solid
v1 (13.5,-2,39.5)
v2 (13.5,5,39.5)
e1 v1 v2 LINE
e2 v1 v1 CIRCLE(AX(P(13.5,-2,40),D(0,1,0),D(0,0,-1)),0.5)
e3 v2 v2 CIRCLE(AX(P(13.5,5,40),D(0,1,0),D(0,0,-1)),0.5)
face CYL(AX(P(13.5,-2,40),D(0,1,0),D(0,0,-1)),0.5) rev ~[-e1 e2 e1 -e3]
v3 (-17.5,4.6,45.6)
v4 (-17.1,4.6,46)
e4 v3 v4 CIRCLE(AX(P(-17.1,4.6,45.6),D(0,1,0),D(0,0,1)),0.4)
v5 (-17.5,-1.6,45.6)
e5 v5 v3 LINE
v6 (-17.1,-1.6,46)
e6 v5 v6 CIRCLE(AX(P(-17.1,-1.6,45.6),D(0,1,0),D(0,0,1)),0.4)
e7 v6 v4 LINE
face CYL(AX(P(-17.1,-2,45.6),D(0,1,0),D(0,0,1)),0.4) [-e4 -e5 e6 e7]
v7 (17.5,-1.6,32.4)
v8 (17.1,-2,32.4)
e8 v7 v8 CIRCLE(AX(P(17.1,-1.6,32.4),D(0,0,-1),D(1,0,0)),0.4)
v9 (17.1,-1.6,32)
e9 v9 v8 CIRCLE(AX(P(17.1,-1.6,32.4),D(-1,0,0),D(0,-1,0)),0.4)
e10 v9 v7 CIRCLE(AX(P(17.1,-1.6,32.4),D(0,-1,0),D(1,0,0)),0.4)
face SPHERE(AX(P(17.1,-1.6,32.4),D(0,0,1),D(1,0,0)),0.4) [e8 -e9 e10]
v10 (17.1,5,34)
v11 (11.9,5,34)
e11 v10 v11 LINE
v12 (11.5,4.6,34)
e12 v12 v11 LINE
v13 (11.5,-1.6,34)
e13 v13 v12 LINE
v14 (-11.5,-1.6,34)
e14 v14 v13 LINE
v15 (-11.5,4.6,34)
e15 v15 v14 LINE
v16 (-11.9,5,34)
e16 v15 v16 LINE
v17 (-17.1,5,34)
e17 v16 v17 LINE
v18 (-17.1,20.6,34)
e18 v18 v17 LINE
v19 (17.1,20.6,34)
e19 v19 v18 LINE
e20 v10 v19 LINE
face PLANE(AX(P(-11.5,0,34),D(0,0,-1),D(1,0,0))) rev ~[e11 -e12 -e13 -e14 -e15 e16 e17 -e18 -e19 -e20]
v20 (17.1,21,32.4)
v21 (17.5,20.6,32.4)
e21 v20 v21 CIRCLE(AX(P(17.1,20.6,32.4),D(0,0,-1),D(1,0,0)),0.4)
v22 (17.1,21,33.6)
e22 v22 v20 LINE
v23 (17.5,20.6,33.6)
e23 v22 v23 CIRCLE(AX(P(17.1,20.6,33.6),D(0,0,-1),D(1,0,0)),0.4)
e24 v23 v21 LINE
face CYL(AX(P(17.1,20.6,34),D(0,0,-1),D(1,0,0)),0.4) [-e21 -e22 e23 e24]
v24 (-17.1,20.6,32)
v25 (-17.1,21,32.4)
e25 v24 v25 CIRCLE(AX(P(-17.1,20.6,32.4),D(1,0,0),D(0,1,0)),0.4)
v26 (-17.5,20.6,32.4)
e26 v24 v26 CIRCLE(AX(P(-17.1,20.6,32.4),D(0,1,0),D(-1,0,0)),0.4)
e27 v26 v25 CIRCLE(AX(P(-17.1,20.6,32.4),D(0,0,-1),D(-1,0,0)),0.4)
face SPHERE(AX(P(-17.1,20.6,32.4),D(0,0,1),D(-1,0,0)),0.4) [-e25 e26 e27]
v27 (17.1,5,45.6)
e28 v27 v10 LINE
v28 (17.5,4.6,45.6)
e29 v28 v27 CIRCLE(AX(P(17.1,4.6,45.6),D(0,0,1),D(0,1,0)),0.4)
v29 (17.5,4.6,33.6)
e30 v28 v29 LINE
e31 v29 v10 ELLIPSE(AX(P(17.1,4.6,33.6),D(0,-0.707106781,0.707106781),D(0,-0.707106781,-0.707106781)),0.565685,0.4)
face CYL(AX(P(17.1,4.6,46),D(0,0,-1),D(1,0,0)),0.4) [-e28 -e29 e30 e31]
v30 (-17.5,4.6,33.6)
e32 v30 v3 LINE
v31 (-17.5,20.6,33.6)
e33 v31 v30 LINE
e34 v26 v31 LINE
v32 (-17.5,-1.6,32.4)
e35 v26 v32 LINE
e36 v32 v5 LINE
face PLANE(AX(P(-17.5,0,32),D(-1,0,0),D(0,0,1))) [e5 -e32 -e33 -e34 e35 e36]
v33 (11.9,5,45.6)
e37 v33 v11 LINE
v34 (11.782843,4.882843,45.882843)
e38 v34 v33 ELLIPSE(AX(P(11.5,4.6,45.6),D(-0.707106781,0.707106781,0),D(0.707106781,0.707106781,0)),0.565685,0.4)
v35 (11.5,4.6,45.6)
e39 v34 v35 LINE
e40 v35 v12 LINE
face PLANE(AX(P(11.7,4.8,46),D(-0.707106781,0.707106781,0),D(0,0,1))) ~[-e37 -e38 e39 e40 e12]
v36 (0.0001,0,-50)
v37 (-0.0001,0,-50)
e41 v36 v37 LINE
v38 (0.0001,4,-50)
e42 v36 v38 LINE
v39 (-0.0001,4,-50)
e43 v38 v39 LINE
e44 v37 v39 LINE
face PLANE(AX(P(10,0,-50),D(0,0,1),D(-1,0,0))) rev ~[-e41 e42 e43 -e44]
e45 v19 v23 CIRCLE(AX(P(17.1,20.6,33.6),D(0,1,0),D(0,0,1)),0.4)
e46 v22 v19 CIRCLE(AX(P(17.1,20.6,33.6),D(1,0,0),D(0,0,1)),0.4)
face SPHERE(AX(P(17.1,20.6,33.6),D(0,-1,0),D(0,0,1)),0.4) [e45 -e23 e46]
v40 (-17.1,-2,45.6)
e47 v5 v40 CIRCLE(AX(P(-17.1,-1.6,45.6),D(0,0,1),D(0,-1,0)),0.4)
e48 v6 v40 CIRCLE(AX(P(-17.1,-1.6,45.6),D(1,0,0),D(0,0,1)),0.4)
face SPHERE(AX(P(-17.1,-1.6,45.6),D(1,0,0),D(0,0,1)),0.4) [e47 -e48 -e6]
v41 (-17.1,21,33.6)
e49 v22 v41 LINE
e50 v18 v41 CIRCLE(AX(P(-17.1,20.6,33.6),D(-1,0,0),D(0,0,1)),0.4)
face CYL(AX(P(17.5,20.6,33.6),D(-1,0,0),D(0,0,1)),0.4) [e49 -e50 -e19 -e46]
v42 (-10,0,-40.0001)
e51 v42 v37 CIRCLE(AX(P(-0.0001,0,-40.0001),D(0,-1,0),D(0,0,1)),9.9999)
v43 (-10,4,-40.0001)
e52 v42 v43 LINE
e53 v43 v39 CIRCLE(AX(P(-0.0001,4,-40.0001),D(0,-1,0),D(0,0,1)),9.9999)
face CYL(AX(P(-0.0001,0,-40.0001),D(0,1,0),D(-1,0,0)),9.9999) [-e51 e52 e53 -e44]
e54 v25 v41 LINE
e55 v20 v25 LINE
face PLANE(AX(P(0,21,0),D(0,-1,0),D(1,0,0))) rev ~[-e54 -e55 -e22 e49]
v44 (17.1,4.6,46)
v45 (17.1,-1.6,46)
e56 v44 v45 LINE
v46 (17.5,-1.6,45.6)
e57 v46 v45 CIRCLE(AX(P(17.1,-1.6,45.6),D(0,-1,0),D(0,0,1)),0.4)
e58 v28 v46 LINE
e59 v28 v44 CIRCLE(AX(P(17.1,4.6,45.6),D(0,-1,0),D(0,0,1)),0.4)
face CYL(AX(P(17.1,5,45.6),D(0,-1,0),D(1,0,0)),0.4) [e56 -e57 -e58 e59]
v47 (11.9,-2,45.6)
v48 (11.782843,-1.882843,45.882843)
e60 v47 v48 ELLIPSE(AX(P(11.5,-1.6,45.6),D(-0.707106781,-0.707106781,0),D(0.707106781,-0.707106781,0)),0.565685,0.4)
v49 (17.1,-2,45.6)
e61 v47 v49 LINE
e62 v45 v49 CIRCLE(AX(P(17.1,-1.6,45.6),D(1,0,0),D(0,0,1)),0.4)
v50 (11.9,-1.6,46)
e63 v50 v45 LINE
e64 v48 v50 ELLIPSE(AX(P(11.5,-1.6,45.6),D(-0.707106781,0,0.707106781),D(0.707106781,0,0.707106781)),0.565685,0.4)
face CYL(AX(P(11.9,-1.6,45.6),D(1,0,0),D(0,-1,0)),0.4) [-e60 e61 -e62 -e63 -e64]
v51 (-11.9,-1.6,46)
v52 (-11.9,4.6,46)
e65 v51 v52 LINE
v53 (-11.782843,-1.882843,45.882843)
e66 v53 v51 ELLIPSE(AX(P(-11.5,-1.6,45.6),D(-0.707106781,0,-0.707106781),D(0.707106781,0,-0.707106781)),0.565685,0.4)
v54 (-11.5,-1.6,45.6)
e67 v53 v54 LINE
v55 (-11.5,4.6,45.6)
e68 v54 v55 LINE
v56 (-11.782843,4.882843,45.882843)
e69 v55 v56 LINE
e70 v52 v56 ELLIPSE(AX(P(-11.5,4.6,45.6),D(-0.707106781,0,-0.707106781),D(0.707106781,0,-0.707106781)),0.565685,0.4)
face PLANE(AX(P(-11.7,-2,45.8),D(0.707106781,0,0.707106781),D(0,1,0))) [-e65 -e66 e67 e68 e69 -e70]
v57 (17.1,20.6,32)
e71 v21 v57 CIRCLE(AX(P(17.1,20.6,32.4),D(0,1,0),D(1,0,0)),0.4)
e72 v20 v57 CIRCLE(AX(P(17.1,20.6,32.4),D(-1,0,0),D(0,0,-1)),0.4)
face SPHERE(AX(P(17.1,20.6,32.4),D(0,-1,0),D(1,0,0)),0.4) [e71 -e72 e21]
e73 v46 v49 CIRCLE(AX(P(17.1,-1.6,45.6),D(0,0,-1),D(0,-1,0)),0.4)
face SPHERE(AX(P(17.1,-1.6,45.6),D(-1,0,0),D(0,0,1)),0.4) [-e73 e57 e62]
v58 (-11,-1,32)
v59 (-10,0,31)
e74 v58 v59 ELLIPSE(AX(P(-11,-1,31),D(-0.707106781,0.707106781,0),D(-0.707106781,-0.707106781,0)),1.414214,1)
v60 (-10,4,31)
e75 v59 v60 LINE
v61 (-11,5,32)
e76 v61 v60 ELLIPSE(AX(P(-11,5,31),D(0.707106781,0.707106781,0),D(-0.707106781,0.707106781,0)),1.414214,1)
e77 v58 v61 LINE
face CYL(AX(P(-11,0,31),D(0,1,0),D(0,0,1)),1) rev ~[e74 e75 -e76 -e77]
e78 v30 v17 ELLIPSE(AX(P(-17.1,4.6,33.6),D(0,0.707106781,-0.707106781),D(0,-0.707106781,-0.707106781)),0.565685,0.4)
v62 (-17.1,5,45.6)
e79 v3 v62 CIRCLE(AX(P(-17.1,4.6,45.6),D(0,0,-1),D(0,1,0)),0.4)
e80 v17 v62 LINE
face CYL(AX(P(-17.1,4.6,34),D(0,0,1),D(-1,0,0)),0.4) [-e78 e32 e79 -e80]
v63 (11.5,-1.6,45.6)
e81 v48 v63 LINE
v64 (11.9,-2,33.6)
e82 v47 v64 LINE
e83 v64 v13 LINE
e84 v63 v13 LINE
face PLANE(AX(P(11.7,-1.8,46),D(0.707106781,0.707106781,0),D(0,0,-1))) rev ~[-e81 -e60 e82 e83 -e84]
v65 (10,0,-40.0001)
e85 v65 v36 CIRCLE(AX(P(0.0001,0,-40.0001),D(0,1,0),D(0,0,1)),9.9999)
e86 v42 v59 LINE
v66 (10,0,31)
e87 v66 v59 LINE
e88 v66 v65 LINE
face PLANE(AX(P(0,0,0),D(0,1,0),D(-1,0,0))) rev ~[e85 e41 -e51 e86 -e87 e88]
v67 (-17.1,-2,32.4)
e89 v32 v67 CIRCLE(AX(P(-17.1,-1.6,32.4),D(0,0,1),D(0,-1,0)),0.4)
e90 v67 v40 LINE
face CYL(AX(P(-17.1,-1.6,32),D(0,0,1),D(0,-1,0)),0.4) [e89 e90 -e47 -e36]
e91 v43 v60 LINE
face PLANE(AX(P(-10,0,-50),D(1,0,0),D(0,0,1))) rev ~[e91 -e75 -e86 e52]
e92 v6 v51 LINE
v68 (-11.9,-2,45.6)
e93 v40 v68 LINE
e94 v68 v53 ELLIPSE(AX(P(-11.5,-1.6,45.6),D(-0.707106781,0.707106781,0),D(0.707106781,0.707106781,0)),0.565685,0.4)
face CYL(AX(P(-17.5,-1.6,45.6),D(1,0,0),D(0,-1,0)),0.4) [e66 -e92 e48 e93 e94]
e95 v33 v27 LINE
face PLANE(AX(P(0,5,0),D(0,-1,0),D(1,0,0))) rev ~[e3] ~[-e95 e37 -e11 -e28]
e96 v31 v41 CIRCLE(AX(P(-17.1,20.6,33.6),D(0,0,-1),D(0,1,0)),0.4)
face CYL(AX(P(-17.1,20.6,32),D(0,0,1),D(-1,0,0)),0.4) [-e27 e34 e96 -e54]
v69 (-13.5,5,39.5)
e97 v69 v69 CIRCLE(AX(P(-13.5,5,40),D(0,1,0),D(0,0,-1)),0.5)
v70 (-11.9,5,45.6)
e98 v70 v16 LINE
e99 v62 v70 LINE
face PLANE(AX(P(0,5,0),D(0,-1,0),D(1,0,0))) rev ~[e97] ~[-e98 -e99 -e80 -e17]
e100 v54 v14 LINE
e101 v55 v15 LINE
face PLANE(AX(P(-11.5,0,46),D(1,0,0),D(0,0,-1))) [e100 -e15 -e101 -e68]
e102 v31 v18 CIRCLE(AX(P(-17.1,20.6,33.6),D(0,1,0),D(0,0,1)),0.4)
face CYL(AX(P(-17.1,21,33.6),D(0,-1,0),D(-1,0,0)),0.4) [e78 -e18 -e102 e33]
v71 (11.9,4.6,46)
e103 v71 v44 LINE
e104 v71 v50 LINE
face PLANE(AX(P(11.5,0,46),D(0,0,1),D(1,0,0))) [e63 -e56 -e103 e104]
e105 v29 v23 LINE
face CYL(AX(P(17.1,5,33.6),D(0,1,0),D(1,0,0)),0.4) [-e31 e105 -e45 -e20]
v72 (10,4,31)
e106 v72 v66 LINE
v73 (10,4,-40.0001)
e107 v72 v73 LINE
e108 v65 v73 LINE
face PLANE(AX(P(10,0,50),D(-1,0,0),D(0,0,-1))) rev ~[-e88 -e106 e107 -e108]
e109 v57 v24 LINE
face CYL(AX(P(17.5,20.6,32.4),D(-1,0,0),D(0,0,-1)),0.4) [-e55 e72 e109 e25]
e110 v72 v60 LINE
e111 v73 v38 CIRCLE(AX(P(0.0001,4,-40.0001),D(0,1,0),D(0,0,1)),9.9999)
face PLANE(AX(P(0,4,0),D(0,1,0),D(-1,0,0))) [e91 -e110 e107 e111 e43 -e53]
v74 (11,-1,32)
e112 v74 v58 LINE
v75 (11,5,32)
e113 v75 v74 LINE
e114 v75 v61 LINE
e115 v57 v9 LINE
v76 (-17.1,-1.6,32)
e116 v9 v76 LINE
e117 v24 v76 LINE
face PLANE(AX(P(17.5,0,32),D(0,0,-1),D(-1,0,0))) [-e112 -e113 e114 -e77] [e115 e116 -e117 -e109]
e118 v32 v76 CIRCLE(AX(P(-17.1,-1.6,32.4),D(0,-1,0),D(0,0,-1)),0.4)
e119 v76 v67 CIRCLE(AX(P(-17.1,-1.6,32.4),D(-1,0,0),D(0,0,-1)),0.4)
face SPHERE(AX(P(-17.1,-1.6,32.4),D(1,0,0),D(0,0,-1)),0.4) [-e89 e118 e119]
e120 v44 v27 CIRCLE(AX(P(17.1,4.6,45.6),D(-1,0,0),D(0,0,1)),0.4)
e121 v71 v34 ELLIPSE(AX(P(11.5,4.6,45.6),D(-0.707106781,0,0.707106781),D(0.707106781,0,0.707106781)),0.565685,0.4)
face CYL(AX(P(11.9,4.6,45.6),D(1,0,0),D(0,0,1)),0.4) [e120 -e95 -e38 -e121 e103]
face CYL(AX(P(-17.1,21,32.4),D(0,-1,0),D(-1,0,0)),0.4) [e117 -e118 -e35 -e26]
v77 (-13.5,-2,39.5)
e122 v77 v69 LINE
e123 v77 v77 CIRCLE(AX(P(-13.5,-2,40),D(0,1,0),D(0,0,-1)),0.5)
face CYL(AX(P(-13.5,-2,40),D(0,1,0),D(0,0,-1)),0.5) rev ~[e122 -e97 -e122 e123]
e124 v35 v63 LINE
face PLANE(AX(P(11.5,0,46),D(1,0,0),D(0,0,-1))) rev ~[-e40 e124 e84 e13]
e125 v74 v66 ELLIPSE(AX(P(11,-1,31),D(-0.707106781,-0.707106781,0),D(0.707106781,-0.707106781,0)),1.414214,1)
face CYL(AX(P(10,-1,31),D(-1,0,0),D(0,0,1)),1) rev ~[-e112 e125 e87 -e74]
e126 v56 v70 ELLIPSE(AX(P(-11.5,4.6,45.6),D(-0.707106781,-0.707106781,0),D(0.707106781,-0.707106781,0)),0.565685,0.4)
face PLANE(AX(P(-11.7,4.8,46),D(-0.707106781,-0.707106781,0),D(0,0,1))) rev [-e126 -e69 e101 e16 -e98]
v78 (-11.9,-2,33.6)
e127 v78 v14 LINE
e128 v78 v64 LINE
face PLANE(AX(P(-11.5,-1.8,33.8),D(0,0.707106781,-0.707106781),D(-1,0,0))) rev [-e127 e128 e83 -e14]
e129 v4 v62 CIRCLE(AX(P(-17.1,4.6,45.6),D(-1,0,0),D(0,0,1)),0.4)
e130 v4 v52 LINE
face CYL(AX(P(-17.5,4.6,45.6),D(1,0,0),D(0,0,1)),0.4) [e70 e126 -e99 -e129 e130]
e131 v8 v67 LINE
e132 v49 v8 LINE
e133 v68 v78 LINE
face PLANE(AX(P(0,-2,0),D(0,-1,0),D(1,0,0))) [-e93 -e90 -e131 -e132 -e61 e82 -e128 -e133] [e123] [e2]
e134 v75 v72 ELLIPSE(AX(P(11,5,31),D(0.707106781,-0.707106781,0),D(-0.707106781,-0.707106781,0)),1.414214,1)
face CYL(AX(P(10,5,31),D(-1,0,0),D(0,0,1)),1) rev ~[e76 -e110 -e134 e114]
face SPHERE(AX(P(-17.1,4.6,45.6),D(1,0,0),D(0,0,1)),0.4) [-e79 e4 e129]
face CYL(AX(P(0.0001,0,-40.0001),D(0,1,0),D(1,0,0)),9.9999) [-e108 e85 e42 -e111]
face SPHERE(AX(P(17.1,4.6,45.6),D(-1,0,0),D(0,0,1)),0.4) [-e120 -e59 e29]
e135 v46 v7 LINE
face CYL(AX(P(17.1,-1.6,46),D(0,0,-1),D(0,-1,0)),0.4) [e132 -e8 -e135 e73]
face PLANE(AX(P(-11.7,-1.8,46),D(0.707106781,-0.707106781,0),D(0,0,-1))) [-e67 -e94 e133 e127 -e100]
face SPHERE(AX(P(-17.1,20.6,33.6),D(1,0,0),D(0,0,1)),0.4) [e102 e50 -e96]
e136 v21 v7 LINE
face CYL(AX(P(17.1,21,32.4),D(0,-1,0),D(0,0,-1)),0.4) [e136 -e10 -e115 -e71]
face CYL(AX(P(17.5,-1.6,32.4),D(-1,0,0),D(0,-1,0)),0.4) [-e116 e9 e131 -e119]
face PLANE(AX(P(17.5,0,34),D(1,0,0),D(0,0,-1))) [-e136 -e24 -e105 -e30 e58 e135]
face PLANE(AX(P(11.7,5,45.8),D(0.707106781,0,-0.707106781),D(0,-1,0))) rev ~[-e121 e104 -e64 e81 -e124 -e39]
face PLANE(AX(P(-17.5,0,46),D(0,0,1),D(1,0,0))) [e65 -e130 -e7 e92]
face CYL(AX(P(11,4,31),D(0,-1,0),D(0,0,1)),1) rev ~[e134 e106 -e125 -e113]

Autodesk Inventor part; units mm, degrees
ref_plane "YZ Plane" through (0, 0, 0) normal (1, 0, 0) x (0, 1, 0)
ref_plane "XZ Plane" through (0, 0, 0) normal (0, 1, 0) x (-1, 0, 0)
ref_plane "XY Plane" through (0, 0, 0) normal (0, 0, 1) x (1, 0, 0)
sketch "Skizze1" plane through (0, 0, 0) normal (0, 1, 0) x (-1, 0, 0)
  line L0 (-10, -50) -> (10, -50)
  line L1 (10, -50) -> (10, 50)
  line L2 (10, 50) -> (-10, 50)
  line L3 (-10, 50) -> (-10, -50)
  line L4 (-10, -50) -> (10, 50) construction
  line L5 (10, -50) -> (-10, 50) construction
  point P0 (0, 0)
  dimension "d0" = 20
  dimension "d1" = 100
extrude "Extrusion1" add sketch "Skizze1" along normal blind 4
fillet "Rundung1" radius 10 4 edges at (10, 2, -50) (-10, 2, -50) (10, 2, 50) (-10, 2, 50)
sketch "Skizze2" plane through (0, 0, 0) normal (0, -1, 0) x (1, 0, 0)
  point P0 (0, 0)
sketch "Skizze3" plane through (0, 0, 0) normal (0, -1, 0) x (1, 0, 0)
  line L0 (-17.5, 34) -> (-17.5, 46)
  line L1 (17.5, 46) -> (17.5, 34)
  line L2 (-11.5, 46) -> (-11.5, 34)
  line L3 (11.5, 46) -> (11.5, 34)
  line L4 (0, -70) -> (0, 70) projected
  line L5 (-17.5, 46) -> (-11.5, 46)
  line L6 (11.5, 46) -> (17.5, 46)
  line L7 (17.5, 34) -> (11.5, 34)
  line L8 (-11.5, 34) -> (-17.5, 34)
  point P0 (0, 0)
  point P1 (0, 34)
  point P2 (11.5, 40)
  point P3 (17.5, 40)
  point P4 (-11.5, 40)
  point P5 (-17.5, 40)
  point P6 (14.5, 34)
  point P7 (-14.5, 34)
  dimension "d6" = 12
  dimension "d7" = 35
  dimension "d11" = 23
  dimension "d12" = 34
  dimension "d13" = 6
sketch "Skizze4" plane through (0, 0, 0) normal (0, -1, 0) x (1, 0, 0)
  arc A0 (10, 40) -> (-10, 40) centre (0, 40) ccw projected
  line L0 (-11.5, 34) -> (-17.5, 34) projected
  line L1 (11.5, 46) -> (11.5, 34) projected
  line L2 (-11.5, 34) -> (11.5, 34)
  line L3 (11.5, 34) -> (11.5, 53)
  line L4 (11.5, 53) -> (-11.5, 53)
  line L5 (-11.5, 53) -> (-11.5, 34)
  point P0 (0, 0)
  dimension "d14" = 19
extrude "Extrusion2" cut sketch "Skizze4" against normal blind 4
extrude "Extrusion3" add sketch "Skizze3" along normal blind 2 and the other way blind 5
sketch "Skizze5" plane through (0, 0, 0) normal (0, -1, 0) x (1, 0, 0)
  line L0 (-17.5, 34) -> (-11.5, 34) projected
  line L1 (11.5, 34) -> (17.5, 34) projected
  line L2 (-17.5, 34) -> (17.5, 34)
  line L3 (17.5, 34) -> (17.5, 32)
  line L4 (17.5, 32) -> (-17.5, 32)
  line L5 (-17.5, 32) -> (-17.5, 34)
  point P0 (0, 0)
  dimension "d21" = 2
extrude "Extrusion4" add sketch "Skizze5" along normal blind 2 and the other way blind 21
fillet "Rundung2" radius 1 4 edges at (10, 2, 32) (0, 0, 32) (0, 4, 32) (-10, 2, 32)
chamfer "Fasen1" distance 0.4 angle 45 7 edges at (-11.5, -2, 40) (-11.5, 1.5, 46) (11.5, -2, 40) (11.5, 1.5, 46) (-11.5, 5, 40) (11.5, 5, 40) (0, -2, 34)
fillet "Rundung3" radius 0.4 19 edges at (-14.7, -2, 46) (-14.7, 5, 46) (-17.5, 1.5, 46) (14.7, 5, 46) (14.7, -2, 46) (17.5, 1.5, 46) (17.5, -2, 39) (17.5, 5, 40) (17.5, 13, 34) (17.5, 9.5, 32) (0, 21, 34) (0, -2, 32) (-17.5, 13, 34) (-17.5, 21, 33) (-17.5, 9.5, 32) (-17.5, -2, 39) (-17.5, 5, 40) (17.5, 21, 33) (0, 21, 32)
sketch "Skizze6" plane through (0, -2, 0) normal (0, -1, 0) x (1, 0, 0)
  line L0 (-17.1, 45.6) -> (-11.9, 45.6) projected
  line L1 (11.9, 45.6) -> (17.1, 45.6) projected
  line L2 (11.5, 34) -> (-11.5, 34) projected
  line L3 (0, -69.2) -> (0, 65.2) projected
  point P0 (0, 0)
  point P1 (-13.5, 40)
  point P2 (13.5, 40)
  dimension "d31" = 6
  dimension "d32" = 27
hole "Bohrung1" at (-13.5, -2, 40) at (13.5, -2, 40) direction (0, 1, 0) diameter 1 end through all
properties part number "L1"
